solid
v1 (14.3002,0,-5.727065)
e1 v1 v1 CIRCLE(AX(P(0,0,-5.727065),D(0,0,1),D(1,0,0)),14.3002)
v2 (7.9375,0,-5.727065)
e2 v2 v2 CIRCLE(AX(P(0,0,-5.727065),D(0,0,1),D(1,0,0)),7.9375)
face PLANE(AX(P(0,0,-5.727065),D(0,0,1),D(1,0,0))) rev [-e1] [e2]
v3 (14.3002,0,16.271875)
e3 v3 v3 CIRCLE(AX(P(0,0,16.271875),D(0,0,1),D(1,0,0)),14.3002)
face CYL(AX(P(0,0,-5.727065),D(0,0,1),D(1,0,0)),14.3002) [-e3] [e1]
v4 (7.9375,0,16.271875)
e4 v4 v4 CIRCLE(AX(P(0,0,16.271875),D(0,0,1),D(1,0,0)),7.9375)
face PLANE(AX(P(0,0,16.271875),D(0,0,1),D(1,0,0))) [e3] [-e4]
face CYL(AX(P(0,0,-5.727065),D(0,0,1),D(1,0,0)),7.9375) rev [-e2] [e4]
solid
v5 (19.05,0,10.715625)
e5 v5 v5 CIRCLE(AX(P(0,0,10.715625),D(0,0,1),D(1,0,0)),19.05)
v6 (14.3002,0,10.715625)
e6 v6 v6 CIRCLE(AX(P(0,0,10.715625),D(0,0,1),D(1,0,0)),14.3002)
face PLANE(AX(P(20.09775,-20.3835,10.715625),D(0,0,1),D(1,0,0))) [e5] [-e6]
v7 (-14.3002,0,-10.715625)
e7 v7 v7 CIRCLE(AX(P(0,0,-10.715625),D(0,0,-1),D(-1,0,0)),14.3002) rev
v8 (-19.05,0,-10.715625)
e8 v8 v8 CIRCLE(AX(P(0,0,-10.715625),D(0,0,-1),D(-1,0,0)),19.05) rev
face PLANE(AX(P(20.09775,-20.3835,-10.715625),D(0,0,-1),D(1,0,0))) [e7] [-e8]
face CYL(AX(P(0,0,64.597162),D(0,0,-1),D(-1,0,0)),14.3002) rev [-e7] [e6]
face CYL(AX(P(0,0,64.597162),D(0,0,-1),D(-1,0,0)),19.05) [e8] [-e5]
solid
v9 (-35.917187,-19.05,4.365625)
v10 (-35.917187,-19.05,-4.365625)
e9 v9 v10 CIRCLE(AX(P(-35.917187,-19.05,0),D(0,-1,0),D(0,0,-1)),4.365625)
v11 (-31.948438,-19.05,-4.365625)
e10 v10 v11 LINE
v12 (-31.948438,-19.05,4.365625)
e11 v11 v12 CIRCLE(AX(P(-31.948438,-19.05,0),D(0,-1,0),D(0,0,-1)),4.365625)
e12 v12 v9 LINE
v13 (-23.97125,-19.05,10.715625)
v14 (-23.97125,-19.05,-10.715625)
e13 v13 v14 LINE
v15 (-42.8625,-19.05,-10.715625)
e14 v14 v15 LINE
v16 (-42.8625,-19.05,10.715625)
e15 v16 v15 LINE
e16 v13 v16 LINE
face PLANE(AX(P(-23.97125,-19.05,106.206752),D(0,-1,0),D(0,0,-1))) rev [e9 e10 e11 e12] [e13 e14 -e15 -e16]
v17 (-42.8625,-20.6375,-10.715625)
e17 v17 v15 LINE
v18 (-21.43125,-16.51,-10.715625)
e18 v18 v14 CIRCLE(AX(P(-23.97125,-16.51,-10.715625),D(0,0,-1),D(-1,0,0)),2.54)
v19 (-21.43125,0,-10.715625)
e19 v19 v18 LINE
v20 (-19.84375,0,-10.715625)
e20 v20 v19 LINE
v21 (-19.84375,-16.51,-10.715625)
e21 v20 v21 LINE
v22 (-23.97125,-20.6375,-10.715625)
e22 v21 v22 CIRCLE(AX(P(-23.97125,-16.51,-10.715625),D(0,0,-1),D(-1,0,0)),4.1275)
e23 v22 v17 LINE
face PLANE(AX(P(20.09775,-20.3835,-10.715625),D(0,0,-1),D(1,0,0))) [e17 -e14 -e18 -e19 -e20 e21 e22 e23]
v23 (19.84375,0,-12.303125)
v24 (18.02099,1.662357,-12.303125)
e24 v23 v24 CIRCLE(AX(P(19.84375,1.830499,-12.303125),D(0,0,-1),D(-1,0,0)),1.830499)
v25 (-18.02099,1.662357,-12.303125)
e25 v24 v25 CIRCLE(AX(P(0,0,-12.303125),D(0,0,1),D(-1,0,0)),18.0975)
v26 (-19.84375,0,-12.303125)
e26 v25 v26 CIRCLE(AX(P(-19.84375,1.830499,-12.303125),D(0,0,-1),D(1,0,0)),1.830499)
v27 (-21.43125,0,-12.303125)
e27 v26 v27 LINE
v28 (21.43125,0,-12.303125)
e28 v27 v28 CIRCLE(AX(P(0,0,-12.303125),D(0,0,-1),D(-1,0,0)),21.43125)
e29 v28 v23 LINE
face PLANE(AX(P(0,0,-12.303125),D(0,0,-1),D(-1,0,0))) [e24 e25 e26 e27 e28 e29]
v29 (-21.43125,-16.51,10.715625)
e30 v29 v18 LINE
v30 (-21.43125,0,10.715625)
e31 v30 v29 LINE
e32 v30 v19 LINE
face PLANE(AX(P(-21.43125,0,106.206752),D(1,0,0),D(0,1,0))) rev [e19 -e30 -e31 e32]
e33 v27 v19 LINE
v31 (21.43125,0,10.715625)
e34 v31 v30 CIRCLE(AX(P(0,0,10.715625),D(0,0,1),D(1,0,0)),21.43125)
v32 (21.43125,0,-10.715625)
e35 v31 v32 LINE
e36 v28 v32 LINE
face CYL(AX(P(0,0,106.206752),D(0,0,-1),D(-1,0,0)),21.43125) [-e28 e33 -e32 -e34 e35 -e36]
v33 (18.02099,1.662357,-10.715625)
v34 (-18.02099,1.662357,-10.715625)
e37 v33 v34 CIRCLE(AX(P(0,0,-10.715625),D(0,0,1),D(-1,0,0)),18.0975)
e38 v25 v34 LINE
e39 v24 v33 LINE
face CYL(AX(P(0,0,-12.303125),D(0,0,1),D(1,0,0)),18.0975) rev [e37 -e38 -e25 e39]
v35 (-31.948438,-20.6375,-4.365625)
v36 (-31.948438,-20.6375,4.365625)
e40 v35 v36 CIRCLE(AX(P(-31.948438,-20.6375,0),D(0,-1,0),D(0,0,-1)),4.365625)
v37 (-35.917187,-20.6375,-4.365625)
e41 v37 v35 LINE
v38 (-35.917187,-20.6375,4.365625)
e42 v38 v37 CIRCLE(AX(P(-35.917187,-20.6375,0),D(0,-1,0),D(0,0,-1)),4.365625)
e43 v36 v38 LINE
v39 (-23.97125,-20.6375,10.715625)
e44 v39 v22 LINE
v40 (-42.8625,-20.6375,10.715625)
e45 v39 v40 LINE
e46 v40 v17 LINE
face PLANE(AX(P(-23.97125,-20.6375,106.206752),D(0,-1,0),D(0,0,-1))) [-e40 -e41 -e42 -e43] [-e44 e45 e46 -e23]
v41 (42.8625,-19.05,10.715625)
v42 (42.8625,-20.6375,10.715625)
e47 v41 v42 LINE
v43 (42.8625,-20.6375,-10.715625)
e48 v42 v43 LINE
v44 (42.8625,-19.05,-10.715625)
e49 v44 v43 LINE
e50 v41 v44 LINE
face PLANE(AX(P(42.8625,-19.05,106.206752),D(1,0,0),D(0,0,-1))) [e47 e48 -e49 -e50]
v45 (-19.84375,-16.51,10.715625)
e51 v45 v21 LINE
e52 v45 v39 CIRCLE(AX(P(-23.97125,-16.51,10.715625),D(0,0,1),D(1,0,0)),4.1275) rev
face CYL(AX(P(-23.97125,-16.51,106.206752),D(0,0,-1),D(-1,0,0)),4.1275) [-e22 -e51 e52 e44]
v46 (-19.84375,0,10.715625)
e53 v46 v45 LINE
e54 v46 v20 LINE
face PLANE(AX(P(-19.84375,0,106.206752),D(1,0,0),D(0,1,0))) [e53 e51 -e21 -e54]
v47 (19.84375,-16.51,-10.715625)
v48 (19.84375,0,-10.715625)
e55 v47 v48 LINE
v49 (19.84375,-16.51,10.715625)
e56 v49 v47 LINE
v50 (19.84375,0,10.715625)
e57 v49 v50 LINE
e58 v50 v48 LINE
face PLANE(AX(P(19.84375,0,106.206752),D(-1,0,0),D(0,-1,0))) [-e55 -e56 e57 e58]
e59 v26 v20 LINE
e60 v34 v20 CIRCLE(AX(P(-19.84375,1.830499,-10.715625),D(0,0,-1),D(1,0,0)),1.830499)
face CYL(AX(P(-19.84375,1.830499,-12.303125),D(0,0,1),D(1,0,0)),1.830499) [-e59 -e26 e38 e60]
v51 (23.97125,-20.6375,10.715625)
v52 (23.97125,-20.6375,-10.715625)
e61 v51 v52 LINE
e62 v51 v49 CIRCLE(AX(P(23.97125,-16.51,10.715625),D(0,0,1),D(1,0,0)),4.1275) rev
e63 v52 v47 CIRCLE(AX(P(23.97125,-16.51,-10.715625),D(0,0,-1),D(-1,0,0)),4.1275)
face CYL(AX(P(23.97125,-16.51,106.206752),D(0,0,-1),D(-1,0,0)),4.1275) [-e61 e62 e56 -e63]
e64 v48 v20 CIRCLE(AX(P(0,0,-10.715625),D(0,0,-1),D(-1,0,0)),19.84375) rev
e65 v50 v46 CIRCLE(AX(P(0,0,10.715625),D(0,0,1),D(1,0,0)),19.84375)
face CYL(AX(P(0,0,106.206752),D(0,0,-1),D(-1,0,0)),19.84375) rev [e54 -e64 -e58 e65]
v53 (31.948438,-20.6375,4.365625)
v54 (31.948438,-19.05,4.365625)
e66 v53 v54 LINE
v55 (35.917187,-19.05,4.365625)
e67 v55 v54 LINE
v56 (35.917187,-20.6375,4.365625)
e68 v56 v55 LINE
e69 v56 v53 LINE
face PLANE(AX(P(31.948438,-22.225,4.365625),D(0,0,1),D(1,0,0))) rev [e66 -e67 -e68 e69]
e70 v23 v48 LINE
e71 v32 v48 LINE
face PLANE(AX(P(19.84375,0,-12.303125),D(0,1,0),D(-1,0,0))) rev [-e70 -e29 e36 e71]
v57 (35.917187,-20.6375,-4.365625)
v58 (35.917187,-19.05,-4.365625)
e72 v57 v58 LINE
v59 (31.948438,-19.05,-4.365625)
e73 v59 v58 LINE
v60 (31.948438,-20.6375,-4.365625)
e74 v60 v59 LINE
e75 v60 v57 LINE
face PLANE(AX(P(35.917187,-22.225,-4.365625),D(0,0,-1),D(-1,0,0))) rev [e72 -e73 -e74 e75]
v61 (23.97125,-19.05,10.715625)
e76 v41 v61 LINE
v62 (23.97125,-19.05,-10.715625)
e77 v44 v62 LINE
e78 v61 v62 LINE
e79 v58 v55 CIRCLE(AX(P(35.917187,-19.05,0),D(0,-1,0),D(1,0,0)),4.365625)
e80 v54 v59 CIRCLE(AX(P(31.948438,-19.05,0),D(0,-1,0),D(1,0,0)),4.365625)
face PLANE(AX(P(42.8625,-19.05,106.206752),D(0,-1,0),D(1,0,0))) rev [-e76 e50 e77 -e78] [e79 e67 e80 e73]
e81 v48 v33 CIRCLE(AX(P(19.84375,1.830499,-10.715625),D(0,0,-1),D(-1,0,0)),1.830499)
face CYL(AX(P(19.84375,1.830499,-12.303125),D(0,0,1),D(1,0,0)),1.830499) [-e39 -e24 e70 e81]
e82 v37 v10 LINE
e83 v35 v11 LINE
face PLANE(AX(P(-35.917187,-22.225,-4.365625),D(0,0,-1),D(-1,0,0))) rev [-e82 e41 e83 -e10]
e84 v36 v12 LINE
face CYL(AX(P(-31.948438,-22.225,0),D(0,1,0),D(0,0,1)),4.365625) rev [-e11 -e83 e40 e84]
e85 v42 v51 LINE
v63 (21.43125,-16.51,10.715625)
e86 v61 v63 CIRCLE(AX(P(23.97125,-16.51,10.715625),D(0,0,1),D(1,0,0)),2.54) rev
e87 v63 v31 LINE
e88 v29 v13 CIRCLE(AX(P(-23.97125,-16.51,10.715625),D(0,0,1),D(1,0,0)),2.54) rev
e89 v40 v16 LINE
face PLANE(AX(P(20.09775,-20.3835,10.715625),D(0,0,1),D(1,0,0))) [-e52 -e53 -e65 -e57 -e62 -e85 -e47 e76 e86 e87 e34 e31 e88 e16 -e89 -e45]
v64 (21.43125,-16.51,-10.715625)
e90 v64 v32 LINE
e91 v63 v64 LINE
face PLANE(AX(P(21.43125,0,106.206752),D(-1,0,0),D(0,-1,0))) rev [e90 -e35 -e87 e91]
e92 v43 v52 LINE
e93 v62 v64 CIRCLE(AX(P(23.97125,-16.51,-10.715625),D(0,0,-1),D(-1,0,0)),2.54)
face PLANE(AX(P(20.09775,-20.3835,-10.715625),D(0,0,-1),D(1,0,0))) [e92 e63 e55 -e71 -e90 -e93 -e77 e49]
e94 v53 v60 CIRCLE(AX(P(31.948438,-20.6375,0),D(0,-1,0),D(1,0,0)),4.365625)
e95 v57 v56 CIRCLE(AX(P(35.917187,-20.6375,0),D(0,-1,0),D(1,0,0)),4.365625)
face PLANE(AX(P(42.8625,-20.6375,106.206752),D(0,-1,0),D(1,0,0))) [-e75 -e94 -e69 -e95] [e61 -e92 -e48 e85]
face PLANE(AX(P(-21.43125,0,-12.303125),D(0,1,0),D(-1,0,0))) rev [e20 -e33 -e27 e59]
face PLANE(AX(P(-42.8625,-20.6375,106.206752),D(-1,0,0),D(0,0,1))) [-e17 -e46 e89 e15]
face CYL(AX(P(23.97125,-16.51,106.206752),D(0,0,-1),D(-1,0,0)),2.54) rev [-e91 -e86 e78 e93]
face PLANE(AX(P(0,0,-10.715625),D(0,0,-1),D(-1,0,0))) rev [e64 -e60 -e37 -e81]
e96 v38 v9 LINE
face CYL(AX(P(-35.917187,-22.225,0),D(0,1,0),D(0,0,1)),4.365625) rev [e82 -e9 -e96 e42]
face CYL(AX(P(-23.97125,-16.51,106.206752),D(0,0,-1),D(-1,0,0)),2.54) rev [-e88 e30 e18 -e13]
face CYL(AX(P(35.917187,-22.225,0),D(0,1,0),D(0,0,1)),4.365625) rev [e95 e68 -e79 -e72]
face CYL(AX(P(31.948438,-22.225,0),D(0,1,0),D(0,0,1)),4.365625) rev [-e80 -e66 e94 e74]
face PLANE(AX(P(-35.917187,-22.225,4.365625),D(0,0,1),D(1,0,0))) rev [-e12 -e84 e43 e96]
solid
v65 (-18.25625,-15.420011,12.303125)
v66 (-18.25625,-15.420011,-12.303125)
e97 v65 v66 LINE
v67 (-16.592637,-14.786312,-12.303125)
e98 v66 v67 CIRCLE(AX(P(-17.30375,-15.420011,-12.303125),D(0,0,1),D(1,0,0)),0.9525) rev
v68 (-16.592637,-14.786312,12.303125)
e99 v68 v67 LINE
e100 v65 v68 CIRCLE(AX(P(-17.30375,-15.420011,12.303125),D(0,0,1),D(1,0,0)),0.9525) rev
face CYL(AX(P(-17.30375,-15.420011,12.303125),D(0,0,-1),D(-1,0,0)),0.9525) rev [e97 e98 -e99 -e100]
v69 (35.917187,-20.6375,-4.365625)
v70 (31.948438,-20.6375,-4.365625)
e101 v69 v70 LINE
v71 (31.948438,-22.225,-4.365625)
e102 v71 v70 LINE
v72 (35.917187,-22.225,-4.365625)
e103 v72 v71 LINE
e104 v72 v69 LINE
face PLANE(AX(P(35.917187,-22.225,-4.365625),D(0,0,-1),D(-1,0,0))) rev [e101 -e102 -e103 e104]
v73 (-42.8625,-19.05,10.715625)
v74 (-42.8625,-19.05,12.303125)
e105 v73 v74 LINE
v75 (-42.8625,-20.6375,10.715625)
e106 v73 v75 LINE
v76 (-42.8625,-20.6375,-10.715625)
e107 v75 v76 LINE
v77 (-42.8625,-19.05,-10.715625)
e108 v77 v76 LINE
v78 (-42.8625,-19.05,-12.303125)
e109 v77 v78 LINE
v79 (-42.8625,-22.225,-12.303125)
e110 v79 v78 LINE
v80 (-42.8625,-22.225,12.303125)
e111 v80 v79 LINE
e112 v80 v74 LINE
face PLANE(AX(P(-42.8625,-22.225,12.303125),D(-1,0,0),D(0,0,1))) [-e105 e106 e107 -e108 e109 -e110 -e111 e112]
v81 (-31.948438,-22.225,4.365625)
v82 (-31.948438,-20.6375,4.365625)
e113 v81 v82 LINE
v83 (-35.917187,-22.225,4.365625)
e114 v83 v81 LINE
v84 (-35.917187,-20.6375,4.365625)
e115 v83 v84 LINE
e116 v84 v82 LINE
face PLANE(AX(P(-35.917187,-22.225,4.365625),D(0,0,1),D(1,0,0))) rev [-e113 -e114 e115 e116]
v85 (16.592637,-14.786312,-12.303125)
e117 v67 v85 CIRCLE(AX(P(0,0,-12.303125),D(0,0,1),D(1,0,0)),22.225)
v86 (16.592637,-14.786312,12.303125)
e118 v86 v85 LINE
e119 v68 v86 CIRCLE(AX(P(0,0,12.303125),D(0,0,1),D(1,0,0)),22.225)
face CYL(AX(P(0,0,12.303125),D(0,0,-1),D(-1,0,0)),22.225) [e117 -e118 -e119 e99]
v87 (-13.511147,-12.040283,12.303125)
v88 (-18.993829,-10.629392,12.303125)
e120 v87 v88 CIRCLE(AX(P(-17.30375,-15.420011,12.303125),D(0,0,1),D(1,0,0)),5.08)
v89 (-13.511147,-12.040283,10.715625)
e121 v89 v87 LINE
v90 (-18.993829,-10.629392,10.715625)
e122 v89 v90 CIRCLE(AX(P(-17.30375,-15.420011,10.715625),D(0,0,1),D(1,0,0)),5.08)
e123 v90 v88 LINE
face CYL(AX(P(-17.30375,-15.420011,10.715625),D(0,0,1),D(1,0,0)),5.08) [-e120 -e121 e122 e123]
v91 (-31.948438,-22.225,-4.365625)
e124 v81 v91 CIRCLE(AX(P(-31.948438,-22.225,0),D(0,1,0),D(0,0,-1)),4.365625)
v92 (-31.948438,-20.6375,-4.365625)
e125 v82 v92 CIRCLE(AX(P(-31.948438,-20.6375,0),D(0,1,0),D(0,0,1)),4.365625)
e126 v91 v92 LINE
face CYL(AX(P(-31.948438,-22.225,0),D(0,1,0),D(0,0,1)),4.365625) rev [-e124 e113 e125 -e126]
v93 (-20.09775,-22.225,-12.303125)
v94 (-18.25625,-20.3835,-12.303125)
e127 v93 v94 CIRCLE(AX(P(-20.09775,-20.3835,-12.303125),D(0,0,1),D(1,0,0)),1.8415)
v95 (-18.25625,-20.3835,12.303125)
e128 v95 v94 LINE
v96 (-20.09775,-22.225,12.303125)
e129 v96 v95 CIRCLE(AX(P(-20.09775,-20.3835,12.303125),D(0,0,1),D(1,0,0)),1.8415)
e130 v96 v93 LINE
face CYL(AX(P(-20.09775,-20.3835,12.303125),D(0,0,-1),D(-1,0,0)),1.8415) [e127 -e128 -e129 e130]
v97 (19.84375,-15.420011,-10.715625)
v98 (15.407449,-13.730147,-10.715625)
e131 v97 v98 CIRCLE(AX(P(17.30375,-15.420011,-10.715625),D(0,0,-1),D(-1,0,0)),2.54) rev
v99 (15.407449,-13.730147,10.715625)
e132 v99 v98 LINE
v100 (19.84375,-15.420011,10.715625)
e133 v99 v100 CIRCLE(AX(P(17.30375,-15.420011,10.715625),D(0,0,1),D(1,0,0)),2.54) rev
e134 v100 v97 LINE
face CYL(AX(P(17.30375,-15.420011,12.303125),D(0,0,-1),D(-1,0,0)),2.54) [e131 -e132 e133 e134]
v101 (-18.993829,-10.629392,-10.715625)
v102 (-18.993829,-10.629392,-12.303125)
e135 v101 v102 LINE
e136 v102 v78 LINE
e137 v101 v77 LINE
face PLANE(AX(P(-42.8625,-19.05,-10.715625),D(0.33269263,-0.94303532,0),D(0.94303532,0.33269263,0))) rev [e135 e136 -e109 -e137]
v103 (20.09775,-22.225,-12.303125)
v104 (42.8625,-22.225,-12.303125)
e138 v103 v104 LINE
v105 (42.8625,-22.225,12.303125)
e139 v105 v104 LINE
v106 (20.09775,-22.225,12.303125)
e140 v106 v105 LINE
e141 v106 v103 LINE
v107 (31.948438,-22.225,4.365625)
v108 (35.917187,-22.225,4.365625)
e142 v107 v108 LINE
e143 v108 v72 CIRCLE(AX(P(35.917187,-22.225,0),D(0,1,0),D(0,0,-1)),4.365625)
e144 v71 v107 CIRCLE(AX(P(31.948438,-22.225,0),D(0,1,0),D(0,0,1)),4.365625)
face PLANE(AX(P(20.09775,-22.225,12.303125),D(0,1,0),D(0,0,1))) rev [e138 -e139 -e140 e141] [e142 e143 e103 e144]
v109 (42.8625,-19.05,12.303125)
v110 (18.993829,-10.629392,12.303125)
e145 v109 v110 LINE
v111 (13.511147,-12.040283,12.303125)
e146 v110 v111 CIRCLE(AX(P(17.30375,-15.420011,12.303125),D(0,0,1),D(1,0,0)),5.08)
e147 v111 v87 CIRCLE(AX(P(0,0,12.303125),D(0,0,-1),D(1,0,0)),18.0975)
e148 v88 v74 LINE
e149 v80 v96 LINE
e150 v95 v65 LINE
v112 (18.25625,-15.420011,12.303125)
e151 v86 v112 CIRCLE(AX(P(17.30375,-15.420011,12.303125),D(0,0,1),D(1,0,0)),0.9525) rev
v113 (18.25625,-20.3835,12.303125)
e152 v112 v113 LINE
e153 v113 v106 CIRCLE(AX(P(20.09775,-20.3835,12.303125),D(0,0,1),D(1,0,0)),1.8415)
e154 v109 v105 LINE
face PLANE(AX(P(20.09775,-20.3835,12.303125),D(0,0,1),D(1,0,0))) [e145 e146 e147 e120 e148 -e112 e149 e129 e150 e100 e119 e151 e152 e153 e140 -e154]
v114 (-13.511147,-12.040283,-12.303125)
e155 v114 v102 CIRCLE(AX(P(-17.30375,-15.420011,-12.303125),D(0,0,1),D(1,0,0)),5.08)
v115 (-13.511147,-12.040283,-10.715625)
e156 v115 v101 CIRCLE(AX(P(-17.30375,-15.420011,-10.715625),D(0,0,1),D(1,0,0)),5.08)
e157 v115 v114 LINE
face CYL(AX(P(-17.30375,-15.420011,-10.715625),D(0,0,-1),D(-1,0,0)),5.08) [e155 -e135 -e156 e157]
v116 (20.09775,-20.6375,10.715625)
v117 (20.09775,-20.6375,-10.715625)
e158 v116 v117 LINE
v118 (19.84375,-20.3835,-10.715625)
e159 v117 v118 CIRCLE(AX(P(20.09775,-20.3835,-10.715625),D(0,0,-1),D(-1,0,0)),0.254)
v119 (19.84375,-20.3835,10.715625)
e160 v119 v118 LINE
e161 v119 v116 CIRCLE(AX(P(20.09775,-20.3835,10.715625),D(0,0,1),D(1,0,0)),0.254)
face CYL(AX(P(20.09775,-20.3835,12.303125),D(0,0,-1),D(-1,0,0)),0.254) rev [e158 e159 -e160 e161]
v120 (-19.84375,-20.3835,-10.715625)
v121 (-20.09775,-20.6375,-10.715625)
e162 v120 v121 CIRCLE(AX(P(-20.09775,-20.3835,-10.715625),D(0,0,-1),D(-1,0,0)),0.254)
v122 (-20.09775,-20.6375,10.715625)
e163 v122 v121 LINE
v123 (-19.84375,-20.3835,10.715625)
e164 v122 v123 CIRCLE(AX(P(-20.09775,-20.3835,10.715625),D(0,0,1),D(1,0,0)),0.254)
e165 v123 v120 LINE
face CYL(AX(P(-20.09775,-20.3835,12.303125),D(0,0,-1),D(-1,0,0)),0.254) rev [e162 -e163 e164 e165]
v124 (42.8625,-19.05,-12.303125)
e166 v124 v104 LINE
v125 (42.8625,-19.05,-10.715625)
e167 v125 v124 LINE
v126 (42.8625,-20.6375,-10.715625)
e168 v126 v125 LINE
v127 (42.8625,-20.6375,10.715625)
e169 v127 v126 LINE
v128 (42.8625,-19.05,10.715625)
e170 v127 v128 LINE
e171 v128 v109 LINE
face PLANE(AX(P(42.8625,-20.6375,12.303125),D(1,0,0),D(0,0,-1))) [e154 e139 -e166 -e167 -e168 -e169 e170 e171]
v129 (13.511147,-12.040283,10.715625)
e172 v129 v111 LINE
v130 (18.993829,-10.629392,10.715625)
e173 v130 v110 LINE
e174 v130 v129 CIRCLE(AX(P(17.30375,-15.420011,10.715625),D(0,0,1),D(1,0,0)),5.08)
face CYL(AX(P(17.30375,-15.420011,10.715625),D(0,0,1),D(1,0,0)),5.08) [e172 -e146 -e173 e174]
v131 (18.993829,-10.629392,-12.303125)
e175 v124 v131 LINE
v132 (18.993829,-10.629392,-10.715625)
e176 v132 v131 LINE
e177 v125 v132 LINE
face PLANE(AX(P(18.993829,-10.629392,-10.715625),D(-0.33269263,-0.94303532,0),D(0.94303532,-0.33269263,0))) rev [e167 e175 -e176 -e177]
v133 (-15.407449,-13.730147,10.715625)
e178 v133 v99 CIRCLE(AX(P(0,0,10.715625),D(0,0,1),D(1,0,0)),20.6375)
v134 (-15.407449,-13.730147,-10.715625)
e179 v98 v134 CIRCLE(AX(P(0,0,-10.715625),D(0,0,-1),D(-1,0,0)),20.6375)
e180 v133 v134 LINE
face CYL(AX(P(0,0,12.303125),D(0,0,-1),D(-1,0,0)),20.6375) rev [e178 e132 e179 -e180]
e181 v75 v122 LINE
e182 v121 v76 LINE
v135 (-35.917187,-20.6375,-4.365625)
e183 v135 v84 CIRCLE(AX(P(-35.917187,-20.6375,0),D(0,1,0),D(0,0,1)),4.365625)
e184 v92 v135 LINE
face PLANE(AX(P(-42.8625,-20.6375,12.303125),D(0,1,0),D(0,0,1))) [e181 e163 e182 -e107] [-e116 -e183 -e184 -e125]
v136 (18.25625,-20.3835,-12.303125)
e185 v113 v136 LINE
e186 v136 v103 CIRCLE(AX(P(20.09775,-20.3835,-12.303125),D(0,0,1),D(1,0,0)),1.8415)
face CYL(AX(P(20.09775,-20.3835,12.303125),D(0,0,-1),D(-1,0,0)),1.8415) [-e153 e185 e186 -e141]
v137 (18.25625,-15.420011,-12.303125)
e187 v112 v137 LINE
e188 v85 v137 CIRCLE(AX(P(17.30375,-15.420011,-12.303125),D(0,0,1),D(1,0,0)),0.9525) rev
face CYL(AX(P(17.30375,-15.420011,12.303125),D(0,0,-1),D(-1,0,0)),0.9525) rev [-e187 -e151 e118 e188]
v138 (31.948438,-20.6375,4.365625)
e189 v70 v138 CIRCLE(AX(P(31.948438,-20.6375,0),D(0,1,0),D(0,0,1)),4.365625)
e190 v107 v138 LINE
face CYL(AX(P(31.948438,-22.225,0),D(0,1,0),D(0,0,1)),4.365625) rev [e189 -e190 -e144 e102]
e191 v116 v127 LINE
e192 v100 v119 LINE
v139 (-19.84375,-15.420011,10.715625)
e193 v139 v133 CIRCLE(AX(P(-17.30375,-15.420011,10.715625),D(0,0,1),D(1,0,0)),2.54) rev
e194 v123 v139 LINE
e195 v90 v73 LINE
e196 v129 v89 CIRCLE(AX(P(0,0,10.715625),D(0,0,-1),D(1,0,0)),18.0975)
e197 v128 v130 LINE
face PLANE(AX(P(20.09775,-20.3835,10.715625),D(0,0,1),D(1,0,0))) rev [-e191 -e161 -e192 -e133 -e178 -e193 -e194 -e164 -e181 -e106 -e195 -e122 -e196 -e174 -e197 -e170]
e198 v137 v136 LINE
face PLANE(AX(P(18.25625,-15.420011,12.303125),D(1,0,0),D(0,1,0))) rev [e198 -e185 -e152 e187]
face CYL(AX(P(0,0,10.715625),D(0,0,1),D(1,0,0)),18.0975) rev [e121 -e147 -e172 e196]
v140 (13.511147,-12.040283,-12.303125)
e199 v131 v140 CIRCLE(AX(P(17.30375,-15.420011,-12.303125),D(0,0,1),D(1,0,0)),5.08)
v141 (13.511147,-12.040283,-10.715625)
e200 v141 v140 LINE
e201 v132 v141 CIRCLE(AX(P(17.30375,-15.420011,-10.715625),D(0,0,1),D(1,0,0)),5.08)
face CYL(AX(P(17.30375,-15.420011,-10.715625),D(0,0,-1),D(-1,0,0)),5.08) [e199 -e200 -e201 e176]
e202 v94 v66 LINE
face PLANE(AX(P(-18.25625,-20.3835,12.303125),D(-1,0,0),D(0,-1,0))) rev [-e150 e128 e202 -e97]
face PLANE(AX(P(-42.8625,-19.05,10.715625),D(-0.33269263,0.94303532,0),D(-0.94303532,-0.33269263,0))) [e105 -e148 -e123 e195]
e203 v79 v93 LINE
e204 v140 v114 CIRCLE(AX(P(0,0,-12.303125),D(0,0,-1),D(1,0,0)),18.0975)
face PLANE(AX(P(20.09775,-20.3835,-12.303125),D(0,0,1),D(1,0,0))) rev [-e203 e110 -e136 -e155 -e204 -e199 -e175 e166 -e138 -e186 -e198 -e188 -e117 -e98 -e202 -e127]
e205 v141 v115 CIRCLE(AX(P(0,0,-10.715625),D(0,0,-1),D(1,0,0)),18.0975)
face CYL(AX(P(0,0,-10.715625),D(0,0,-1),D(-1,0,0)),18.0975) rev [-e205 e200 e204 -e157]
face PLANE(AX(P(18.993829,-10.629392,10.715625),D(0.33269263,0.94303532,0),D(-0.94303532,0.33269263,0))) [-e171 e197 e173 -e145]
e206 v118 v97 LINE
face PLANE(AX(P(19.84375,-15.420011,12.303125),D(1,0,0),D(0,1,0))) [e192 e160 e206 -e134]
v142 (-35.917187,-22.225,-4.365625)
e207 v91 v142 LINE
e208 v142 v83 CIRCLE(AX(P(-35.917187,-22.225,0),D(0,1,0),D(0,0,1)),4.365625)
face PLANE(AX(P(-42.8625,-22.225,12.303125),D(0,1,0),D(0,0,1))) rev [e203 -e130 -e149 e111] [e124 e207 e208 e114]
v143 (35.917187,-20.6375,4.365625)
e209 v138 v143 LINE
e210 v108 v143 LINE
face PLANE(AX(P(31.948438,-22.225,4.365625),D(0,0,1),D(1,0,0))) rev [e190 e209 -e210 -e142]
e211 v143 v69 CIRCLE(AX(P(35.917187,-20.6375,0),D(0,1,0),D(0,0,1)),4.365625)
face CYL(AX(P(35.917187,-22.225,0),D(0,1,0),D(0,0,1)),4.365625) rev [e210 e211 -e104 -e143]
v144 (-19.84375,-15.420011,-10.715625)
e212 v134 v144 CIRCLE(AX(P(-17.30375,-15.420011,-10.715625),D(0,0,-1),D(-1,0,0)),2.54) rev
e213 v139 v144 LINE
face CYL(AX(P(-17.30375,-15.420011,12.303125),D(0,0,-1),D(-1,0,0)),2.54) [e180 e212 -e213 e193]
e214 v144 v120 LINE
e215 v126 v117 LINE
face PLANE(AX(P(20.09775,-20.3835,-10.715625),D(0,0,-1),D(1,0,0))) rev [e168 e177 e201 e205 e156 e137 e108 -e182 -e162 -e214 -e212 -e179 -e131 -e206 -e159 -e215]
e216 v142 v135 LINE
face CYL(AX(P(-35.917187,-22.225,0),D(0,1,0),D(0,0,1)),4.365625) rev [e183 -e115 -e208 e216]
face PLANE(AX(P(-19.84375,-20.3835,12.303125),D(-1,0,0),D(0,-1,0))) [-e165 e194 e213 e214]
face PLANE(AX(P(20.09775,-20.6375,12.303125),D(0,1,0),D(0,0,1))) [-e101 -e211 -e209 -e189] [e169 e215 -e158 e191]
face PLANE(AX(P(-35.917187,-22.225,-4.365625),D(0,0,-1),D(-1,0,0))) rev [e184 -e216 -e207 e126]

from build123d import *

# Parameters (mm, degrees)
EXTRUDE_THIN2_DEPTH  = 12.303125
EXTRUDE1_DEPTH       = 1.5875
EXTRUDE_THIN3_START  = -10.715625
EXTRUDE_THIN3_DEPTH  = 21.43125
EXTRUDE2_DEPTH       = 1.5875
EXTRUDE3_START       = -10.715625
EXTRUDE3_OUTLINE_R   = 19.05
EXTRUDE3_OUTLINE_R_2 = 14.3002
EXTRUDE3_DEPTH       = 21.43125
SKETCH8_R            = 14.3002
SKETCH8_R_2          = 7.9375
EXTRUDE4_DEPTH       = 21.99894
CUT_EXTRUDE1_DEPTH   = 51.950156499


# Read off the part's stored shape, not the designer's step: Extrude-Thin3, Extrude3
with BuildPart() as part:
    # Sketch1 → Extrude-Thin2 (new, symmetric)
    with BuildSketch(Plane.XY):
        with BuildLine():
            Line((-42.8625, -20.6375), (-20.09775, -20.6375))
            ThreePointArc((-20.09775, -20.6375), (-19.918144878, -20.563105122), (-19.84375, -20.3835))
            Line((-19.84375, -20.3835), (-19.84375, -15.420011096))
            ThreePointArc((-19.84375, -15.420011096), (-18.207905551, -13.0463846), (-15.40744863, -13.730146866))
            ThreePointArc((-15.40744863, -13.730146866), (0, -20.6375), (15.40744863, -13.730146866))
            ThreePointArc((15.40744863, -13.730146866), (18.207905551, -13.0463846), (19.84375, -15.420011096))
            Line((19.84375, -15.420011096), (19.84375, -20.3835))
            ThreePointArc((19.84375, -20.3835), (19.918144878, -20.563105122), (20.09775, -20.6375))
            Line((20.09775, -20.6375), (42.8625, -20.6375))
            Line((42.8625, -20.6375), (42.8625, -22.225))
            Line((42.8625, -22.225), (20.09775, -22.225))
            ThreePointArc((20.09775, -22.225), (18.795612862, -21.685637138), (18.25625, -20.3835))
            Line((18.25625, -20.3835), (18.25625, -15.420011096))
            ThreePointArc((18.25625, -15.420011096), (17.642808332, -14.52990116), (16.592636986, -14.786312009))
            ThreePointArc((16.592636986, -14.786312009), (0, -22.225), (-16.592636986, -14.786312009))
            ThreePointArc((-16.592636986, -14.786312009), (-17.642808332, -14.52990116), (-18.25625, -15.420011096))
            Line((-18.25625, -15.420011096), (-18.25625, -20.3835))
            ThreePointArc((-18.25625, -20.3835), (-18.795612862, -21.685637138), (-20.09775, -22.225))
            Line((-20.09775, -22.225), (-42.8625, -22.225))
            Line((-42.8625, -22.225), (-42.8625, -20.6375))
        make_face()
    extrude(amount=EXTRUDE_THIN2_DEPTH, both=True)

    # Sketch4 → Extrude1 (add)
    with BuildSketch(Plane.XY.offset(12.303125)):
        with BuildLine():
            Line((-42.8625, -19.05), (-18.993828558, -10.629391671))
            ThreePointArc((-18.993828558, -10.629391671), (-16.037730525, -10.500296197), (-13.51114726, -12.040282636))
            ThreePointArc((-13.51114726, -12.040282636), (0, -18.0975), (13.51114726, -12.040282636))
            ThreePointArc((13.51114726, -12.040282636), (16.037730525, -10.500296197), (18.993828558, -10.629391671))
            Line((18.993828558, -10.629391671), (42.8625, -19.05))
            Line((42.8625, -19.05), (42.8625, -22.225))
            Line((42.8625, -22.225), (20.09775, -22.225))
            ThreePointArc((20.09775, -22.225), (18.795612862, -21.685637138), (18.25625, -20.3835))
            Line((18.25625, -20.3835), (18.25625, -15.420011096))
            ThreePointArc((18.25625, -15.420011096), (17.642808332, -14.52990116), (16.592636986, -14.786312009))
            ThreePointArc((16.592636986, -14.786312009), (0, -22.225), (-16.592636986, -14.786312009))
            ThreePointArc((-16.592636986, -14.786312009), (-17.642808332, -14.52990116), (-18.25625, -15.420011096))
            Line((-18.25625, -15.420011096), (-18.25625, -20.3835))
            ThreePointArc((-18.25625, -20.3835), (-18.795612862, -21.685637138), (-20.09775, -22.225))
            Line((-20.09775, -22.225), (-42.8625, -22.225))
            Line((-42.8625, -22.225), (-42.8625, -19.05))
        make_face()
    extrude1 = extrude(amount=-EXTRUDE1_DEPTH)

    # Mirror1: Extrude1 across plane
    add(extrude1.mirror(Plane.XY))


with BuildPart() as body_2:
    # Extrude-Thin3 outline → Extrude-Thin3 (new body)
    with BuildSketch(Plane.XY.offset(EXTRUDE_THIN3_START)):
        with BuildLine():
            Line((-23.97125, -19.05), (-42.8625, -19.05))
            Line((-42.8625, -19.05), (-42.8625, -20.6375))
            Line((-42.8625, -20.6375), (-23.97125, -20.6375))
            ThreePointArc((-23.97125, -20.6375), (-21.052666761, -19.428583239), (-19.84375, -16.51))
            Line((-19.84375, -16.51), (-19.84375, 0))
            ThreePointArc((-19.84375, 0), (0, 19.84375), (19.84375, 0))
            Line((19.84375, 0), (19.84375, -16.51))
            ThreePointArc((19.84375, -16.51), (21.052666761, -19.428583239), (23.97125, -20.6375))
            Line((23.97125, -20.6375), (42.8625, -20.6375))
            Line((42.8625, -20.6375), (42.8625, -19.05))
            Line((42.8625, -19.05), (23.97125, -19.05))
            ThreePointArc((23.97125, -19.05), (22.175198776, -18.306051224), (21.43125, -16.51))
            Line((21.43125, -16.51), (21.43125, 0))
            ThreePointArc((21.43125, 0), (0, 21.43125), (-21.43125, 0))
            Line((-21.43125, 0), (-21.43125, -16.51))
            ThreePointArc((-21.43125, -16.51), (-22.175198776, -18.306051224), (-23.97125, -19.05))
        make_face()
    extrude(amount=EXTRUDE_THIN3_DEPTH)

    # Sketch6 → Extrude2 (add)
    with BuildSketch(Plane(origin=(0, 0, -10.715625), x_dir=(-1, 0, 0), z_dir=(0, 0, -1))):
        with BuildLine():
            Line((-19.84375, 0), (-21.43125, 0))
            ThreePointArc((-21.43125, 0), (0, 21.43125), (21.43125, 0))
            Line((21.43125, 0), (19.84375, 0))
            ThreePointArc((19.84375, 0), (18.610270538, 0.477999494), (18.020989833, 1.662357273))
            ThreePointArc((18.020989833, 1.662357273), (0, 18.0975), (-18.020989833, 1.662357273))
            ThreePointArc((-18.020989833, 1.662357273), (-18.610270538, 0.477999494), (-19.84375, 0))
        make_face()
    extrude(amount=EXTRUDE2_DEPTH)


with BuildPart() as body_3:
    # Extrude3 outline → Extrude3 (new body)
    with BuildSketch(Plane.XY.offset(EXTRUDE3_START)):
        Circle(EXTRUDE3_OUTLINE_R)
        Circle(EXTRUDE3_OUTLINE_R_2, mode=Mode.SUBTRACT)
    extrude(amount=EXTRUDE3_DEPTH)


with BuildPart() as body_4:
    # Sketch8 → Extrude4 (new body)
    with BuildSketch(Plane.XY.offset(16.271875)):
        Circle(SKETCH8_R)
        Circle(SKETCH8_R_2, mode=Mode.SUBTRACT)
    extrude(amount=-EXTRUDE4_DEPTH)


with BuildPart() as cut_extrude1_tool:
    # Sketch3 → Cut-Extrude1 (new, through all)
    with BuildSketch(Plane(origin=(0, 0, 0), x_dir=(1, 0, 0), z_dir=(0, 1, 0))):
        with BuildLine():
            Line((-35.9171875, 4.365625), (-31.9484375, 4.365625))
            ThreePointArc((-31.9484375, 4.365625), (-27.5828125, 0), (-31.9484375, -4.365625))
            Line((-31.9484375, -4.365625), (-35.9171875, -4.365625))
            ThreePointArc((-35.9171875, -4.365625), (-40.2828125, 0), (-35.9171875, 4.365625))
        make_face()
        with BuildLine():
            Line((31.9484375, -4.365625), (35.9171875, -4.365625))
            ThreePointArc((35.9171875, -4.365625), (40.2828125, 0), (35.9171875, 4.365625))
            Line((35.9171875, 4.365625), (31.9484375, 4.365625))
            ThreePointArc((31.9484375, 4.365625), (27.5828125, 0), (31.9484375, -4.365625))
        make_face()
    extrude(amount=-CUT_EXTRUDE1_DEPTH)


with BuildPart() as part_1:
    add(part.part)

    # Cut-Extrude1: cut by cut_extrude1_tool
    add(cut_extrude1_tool.part, mode=Mode.SUBTRACT)


with BuildPart() as body_2_1:
    add(body_2.part)

    # Cut-Extrude1: cut by cut_extrude1_tool
    add(cut_extrude1_tool.part, mode=Mode.SUBTRACT)


solid = Compound([body_3.part, body_4.part, part_1.part, body_2_1.part])
